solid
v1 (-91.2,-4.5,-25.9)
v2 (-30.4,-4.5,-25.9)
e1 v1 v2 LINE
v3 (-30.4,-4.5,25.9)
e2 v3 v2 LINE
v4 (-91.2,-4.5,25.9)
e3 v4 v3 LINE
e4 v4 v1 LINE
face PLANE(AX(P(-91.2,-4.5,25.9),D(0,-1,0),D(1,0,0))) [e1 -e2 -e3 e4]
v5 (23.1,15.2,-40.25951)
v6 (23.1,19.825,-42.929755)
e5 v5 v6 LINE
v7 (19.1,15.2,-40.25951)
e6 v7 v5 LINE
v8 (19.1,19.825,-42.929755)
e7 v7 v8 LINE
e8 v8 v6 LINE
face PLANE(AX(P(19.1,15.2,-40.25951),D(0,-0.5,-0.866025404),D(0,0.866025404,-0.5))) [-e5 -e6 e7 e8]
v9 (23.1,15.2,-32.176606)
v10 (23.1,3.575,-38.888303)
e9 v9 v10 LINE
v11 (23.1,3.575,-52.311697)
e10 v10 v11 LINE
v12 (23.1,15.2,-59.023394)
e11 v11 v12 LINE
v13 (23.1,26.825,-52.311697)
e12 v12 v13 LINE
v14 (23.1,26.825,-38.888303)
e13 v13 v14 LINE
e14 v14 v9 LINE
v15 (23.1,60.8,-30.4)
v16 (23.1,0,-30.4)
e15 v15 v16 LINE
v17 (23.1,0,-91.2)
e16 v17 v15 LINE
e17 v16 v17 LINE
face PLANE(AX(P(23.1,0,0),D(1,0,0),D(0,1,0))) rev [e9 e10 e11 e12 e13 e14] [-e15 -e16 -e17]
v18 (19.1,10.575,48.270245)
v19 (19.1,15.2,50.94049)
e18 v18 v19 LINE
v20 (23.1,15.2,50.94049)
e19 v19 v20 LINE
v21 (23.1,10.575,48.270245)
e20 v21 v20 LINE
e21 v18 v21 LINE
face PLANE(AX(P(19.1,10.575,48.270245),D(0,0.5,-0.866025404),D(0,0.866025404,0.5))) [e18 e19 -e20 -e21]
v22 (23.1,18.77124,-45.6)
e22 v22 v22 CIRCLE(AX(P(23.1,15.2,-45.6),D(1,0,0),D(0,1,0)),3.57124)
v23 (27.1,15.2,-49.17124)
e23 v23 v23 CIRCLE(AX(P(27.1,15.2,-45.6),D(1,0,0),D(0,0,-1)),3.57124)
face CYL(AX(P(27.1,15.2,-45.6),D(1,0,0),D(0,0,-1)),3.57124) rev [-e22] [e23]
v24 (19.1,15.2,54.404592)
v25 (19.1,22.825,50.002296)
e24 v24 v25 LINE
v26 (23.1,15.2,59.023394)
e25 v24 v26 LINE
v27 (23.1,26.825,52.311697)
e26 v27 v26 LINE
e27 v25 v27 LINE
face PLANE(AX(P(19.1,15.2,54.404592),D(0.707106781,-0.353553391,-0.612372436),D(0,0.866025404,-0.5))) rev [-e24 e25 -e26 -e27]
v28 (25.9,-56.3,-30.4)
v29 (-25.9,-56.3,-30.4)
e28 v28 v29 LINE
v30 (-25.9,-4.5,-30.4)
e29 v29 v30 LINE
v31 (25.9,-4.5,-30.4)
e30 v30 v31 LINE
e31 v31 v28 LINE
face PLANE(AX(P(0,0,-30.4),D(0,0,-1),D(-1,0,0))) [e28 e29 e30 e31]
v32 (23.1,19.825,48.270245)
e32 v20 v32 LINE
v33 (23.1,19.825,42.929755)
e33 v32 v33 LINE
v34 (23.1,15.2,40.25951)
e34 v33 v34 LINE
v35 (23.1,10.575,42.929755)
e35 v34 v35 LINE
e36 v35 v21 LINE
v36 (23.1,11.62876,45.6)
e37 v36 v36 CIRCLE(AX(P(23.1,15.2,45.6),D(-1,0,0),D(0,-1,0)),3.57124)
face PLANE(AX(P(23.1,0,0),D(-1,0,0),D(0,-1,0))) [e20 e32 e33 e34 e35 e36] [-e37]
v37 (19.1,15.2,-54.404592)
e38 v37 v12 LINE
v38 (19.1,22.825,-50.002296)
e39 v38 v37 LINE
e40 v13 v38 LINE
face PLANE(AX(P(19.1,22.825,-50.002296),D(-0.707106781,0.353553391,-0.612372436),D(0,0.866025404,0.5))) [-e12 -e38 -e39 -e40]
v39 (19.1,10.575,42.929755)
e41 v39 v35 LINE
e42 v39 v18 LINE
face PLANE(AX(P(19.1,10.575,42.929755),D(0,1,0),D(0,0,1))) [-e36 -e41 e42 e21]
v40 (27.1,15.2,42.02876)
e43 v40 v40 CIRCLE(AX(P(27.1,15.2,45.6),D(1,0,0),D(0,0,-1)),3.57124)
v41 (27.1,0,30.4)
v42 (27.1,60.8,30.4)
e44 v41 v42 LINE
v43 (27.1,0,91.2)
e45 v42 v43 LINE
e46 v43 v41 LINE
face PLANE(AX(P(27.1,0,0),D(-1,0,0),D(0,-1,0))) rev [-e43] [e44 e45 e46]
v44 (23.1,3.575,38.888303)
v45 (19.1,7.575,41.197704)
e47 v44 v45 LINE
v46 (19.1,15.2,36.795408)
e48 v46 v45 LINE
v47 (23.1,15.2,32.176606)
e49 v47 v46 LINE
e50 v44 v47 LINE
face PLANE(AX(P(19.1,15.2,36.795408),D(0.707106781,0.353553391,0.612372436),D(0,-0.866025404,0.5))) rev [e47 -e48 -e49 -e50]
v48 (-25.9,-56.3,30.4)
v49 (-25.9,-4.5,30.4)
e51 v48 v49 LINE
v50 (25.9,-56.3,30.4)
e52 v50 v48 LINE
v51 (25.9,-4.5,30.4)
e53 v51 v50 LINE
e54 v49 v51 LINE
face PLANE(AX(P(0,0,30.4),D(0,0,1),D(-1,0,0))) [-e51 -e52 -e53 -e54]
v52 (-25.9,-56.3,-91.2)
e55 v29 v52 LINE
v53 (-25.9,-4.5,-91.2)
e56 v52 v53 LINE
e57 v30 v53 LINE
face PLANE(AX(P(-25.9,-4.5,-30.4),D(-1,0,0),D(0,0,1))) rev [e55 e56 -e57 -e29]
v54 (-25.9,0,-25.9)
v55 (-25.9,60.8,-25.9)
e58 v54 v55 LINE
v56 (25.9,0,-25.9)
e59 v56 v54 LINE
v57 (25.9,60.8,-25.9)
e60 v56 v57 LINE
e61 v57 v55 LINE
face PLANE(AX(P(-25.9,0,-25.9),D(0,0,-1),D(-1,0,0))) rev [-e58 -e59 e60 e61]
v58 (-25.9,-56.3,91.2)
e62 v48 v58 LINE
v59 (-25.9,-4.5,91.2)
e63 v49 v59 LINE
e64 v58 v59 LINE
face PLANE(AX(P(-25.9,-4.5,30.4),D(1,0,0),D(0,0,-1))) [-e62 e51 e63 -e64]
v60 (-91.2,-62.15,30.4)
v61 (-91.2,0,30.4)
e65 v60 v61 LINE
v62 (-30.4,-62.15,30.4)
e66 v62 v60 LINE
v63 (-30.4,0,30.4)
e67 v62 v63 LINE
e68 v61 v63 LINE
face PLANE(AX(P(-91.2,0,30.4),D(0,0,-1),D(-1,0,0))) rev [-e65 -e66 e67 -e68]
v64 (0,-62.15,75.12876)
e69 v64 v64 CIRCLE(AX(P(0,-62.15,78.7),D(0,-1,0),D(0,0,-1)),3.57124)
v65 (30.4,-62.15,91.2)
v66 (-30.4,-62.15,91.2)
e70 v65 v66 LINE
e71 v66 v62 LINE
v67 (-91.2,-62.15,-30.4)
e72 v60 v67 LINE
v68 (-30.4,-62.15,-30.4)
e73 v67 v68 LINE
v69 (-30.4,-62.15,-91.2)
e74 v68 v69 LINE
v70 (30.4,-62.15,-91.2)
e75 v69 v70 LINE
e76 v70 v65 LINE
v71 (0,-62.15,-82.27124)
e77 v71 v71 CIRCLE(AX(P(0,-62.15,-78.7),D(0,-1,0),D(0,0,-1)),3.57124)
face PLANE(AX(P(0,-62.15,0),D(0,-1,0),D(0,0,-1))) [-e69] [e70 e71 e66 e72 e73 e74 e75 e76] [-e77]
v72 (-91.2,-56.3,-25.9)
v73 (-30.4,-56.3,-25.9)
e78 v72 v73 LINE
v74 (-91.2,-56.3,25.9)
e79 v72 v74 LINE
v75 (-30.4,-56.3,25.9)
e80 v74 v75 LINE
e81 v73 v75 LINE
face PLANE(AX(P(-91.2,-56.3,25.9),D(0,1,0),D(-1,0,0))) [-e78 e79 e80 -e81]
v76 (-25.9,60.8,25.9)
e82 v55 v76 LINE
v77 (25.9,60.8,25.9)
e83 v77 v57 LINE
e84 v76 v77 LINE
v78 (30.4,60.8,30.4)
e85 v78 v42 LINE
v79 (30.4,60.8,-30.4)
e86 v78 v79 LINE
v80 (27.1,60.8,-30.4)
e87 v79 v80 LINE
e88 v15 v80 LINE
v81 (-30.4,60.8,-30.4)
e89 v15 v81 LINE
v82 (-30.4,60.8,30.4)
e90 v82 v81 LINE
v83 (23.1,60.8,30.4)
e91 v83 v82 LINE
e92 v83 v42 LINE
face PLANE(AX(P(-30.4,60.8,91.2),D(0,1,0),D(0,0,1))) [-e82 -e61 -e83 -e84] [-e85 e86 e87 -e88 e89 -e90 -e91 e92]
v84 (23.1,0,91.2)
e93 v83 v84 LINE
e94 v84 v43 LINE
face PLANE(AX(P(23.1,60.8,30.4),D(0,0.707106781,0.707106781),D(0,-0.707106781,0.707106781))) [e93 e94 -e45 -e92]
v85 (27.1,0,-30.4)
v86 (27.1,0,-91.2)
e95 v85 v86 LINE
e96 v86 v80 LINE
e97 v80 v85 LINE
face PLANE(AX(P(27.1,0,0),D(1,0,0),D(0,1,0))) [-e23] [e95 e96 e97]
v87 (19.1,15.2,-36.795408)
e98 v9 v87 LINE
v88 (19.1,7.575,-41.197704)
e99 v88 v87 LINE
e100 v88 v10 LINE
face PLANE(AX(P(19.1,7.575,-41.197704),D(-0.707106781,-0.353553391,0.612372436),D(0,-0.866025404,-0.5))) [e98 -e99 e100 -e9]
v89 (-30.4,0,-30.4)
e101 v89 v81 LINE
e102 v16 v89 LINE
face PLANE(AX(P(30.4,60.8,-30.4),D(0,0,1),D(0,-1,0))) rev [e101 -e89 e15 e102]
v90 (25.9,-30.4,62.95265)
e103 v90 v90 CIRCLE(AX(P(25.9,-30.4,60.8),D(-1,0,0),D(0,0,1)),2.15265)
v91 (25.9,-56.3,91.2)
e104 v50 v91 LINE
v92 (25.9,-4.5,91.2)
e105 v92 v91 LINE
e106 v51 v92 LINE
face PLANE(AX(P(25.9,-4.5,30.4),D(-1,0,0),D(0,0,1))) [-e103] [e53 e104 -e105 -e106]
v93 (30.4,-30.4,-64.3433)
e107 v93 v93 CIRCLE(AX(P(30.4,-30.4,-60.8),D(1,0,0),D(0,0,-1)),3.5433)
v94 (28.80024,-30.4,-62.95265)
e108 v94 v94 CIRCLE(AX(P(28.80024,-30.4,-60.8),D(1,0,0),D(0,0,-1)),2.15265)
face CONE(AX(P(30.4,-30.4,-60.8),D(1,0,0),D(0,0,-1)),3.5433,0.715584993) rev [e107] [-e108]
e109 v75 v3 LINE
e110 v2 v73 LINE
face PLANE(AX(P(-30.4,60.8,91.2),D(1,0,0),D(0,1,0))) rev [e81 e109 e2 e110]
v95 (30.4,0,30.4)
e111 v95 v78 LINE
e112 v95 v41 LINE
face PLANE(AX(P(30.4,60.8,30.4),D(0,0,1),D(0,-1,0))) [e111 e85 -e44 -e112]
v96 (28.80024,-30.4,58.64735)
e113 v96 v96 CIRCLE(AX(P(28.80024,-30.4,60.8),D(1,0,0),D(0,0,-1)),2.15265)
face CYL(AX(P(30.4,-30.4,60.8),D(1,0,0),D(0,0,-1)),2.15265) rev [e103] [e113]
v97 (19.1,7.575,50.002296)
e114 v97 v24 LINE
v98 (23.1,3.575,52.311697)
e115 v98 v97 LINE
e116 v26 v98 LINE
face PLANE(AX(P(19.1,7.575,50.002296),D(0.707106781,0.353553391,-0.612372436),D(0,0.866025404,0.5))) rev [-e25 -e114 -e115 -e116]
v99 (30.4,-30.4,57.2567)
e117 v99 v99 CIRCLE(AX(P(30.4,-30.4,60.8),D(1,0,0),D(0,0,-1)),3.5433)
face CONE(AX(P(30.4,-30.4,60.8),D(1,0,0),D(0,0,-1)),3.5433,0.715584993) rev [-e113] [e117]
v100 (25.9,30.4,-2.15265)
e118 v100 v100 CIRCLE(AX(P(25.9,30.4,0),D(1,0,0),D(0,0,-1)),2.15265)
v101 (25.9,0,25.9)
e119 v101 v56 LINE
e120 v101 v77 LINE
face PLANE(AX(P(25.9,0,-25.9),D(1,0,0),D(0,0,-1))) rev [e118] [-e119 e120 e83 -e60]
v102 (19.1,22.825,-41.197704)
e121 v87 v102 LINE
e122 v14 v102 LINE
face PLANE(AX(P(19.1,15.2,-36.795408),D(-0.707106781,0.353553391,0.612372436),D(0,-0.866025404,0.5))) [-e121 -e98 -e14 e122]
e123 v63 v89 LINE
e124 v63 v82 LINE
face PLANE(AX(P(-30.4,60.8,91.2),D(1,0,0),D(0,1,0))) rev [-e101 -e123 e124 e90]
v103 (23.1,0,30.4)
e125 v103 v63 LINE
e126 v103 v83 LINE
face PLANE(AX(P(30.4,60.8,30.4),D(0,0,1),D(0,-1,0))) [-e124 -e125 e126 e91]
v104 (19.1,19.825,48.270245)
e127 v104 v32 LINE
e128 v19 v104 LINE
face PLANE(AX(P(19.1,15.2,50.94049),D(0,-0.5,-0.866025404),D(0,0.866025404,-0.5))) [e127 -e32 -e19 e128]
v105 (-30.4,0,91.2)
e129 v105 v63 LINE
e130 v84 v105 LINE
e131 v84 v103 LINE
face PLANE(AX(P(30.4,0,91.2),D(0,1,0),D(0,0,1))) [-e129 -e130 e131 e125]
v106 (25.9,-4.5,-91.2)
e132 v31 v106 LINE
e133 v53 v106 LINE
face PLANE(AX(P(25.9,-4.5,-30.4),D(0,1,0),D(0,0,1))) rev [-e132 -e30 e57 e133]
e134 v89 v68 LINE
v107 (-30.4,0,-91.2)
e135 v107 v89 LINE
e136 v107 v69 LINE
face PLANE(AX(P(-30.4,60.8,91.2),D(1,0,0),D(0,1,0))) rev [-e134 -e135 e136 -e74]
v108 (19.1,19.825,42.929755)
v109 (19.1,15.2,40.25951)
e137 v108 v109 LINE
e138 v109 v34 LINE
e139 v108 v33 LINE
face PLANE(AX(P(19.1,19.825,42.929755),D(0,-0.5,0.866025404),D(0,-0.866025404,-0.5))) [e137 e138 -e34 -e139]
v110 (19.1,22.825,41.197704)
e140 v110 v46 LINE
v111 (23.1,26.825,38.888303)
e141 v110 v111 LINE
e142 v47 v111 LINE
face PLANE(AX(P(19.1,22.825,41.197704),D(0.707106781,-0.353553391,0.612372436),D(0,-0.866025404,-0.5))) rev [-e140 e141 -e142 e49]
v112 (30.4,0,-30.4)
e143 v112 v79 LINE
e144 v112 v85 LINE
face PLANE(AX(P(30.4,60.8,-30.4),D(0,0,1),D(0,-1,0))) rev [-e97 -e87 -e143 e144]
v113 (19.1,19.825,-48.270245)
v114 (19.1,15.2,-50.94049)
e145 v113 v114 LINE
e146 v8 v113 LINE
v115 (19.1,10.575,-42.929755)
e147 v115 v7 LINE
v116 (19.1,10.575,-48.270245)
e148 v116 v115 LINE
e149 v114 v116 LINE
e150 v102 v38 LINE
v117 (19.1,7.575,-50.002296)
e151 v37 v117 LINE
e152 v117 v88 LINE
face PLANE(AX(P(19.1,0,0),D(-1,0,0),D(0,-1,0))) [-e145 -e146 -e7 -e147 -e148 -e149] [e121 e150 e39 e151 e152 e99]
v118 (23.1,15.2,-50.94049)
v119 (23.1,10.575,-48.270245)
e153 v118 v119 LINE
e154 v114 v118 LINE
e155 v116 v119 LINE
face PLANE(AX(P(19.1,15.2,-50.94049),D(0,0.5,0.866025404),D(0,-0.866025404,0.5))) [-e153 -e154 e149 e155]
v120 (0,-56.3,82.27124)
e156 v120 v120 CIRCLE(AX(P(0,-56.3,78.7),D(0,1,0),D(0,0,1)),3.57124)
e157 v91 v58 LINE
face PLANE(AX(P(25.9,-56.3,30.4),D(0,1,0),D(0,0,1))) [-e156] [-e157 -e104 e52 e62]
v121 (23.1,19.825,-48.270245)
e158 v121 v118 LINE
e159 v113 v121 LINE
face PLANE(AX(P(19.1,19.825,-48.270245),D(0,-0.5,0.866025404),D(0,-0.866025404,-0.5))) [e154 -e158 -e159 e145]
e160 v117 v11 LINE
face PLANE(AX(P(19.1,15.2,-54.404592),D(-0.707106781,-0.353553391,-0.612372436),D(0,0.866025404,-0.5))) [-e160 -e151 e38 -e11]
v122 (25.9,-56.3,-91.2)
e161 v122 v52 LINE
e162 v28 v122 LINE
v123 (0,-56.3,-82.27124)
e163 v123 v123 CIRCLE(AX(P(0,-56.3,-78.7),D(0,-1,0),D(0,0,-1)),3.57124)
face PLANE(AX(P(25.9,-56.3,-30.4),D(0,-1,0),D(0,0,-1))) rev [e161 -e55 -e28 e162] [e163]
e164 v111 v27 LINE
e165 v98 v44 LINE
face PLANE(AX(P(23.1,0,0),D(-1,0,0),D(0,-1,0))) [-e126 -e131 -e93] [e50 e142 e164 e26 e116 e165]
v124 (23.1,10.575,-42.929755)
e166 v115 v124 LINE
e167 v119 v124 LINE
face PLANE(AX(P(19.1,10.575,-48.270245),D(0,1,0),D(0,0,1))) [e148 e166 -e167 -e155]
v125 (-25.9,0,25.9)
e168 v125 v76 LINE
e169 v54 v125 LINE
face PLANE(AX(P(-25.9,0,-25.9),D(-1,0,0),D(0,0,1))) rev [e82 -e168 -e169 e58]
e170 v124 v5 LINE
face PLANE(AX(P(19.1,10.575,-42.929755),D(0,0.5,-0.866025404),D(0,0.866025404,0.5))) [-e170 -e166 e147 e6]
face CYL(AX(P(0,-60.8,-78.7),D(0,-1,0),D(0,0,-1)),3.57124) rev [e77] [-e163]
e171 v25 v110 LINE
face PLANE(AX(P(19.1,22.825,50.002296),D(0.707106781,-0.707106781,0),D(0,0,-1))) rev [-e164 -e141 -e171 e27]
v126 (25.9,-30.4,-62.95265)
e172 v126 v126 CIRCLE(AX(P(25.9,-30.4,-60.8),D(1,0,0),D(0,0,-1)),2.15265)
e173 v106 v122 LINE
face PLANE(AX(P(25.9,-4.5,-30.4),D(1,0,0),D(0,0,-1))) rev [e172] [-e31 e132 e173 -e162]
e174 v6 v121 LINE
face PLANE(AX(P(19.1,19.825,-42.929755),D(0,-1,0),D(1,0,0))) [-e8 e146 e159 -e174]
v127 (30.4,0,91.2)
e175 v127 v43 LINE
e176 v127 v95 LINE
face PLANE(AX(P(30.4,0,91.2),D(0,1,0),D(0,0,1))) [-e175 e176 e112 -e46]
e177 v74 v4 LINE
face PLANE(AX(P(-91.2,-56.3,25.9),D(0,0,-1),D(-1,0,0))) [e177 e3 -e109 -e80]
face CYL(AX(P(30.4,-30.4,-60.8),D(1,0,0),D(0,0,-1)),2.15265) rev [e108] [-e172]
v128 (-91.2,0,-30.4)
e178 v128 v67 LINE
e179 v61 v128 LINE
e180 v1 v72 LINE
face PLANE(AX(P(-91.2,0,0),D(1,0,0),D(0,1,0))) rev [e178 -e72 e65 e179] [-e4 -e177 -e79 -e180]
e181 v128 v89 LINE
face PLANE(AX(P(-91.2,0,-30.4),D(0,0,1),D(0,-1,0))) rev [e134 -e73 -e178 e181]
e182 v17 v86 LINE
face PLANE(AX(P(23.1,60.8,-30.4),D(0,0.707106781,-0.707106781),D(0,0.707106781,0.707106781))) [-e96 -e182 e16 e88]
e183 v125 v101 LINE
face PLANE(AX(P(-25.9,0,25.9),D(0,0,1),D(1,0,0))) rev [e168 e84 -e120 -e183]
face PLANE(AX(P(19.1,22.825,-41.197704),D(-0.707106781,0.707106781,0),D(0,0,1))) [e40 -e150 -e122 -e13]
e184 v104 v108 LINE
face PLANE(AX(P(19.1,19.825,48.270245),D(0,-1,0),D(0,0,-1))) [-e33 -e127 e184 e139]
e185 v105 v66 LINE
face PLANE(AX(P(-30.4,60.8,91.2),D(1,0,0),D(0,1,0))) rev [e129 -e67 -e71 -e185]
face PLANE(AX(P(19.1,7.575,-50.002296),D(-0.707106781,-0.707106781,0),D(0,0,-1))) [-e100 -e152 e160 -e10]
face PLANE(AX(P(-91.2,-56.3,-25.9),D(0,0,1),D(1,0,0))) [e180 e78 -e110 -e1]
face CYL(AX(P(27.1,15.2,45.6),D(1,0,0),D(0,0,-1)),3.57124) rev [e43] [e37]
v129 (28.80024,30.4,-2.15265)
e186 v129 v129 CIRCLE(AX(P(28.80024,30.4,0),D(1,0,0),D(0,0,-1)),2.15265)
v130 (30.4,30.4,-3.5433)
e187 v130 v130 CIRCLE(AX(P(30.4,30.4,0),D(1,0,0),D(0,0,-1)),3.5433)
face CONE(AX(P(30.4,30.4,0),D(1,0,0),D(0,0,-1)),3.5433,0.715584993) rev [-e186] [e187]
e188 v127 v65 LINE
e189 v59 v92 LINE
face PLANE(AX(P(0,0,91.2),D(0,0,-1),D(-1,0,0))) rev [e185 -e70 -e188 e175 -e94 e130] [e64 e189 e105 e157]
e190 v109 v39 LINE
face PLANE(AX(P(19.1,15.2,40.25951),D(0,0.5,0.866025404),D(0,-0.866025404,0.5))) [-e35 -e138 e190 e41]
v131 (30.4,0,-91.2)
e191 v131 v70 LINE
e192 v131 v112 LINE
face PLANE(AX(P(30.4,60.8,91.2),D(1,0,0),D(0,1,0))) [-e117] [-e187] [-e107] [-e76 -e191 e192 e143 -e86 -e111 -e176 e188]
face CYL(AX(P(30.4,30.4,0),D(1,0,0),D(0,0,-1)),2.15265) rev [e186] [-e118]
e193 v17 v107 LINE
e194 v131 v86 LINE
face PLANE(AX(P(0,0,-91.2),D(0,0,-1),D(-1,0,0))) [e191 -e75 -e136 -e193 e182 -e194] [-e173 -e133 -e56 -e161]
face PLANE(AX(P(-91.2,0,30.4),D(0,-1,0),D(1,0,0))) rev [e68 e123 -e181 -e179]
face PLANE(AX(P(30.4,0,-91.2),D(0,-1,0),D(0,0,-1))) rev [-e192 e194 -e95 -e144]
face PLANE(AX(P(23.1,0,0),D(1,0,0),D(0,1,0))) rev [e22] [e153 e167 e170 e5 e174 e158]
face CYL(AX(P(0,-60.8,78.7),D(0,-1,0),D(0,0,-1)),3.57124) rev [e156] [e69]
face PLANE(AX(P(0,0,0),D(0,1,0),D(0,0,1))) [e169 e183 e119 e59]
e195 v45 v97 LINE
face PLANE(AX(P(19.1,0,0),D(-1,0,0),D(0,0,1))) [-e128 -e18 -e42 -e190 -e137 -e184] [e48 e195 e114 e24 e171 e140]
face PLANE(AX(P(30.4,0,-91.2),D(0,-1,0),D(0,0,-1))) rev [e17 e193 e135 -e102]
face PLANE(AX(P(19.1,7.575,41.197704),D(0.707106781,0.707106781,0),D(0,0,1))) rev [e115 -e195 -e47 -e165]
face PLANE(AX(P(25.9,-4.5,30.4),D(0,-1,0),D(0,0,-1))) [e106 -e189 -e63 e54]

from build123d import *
from build123d.topology import SkipClean

# Parameters (mm, degrees)
ESQUISSE1_W                                       = 60.8
ESQUISSE1_H                                       = 121.6
BOSS_EXTRU_1_DEPTH                                = 91.2
ESQUISSE2_W                                       = 60.8
ESQUISSE2_H                                       = 60.8
ENL_V_MAT_EXTRU_1_DEPTH                           = 126.342411019
ESQUISSE3_W                                       = 51.8
ESQUISSE3_H                                       = 51.8
ENL_V_MAT_EXTRU_2_DEPTH                           = 60.8
BOSS_EXTRU_3_DEPTH                                = 4
ESQUISSE6_W                                       = 51.8
ESQUISSE6_H                                       = 51.8
ENL_V_MAT_EXTRU_3_DEPTH                           = 60.8
D_GAGEMENT_1_43_D                                 = 7.14248
FRAISAGE_POUR_VIS_T_TE_FRAIS_E_BOMB_E_D           = 4.3053
FRAISAGE_POUR_VIS_T_TE_FRAIS_E_BOMB_E_DEPTH       = 4.5
FRAISAGE_POUR_VIS_T_TE_FRAIS_E_BOMB_E_CSINK_D     = 7.0866
FRAISAGE_POUR_VIS_T_TE_FRAIS_E_BOMB_E_CSINK_ANGLE = 82
D_GAGEMENT_1_42_D                                 = 7.14248
D_GAGEMENT_1_42_DEPTH                             = 20
BOSS_EXTRU_5_DEPTH                                = 4
CHANFREIN1_SIZE                                   = 4
ESQUISSE26_W                                      = 60.8
ESQUISSE26_H                                      = 60.8
ESQUISSE26_W_2                                    = 51.800000032
ESQUISSE26_H_2                                    = 51.800000032
BOSS_EXTRU_8_DEPTH                                = 60.800000066
ESQUISSE27_R                                      = 3.57124
BOSS_EXTRU_9_DEPTH                                = 1.35


with BuildPart() as part:
    # Esquisse1 → Boss.-Extru.1 (new, symmetric)
    with BuildSketch(Plane.XY):
        Rectangle(ESQUISSE1_W, ESQUISSE1_H)
    extrude(amount=BOSS_EXTRU_1_DEPTH, both=True)

    # Esquisse2 → Enlèv. mat.-Extru.1 (cut, through all)
    with BuildSketch(Plane.ZY.offset(30.4)):
        with Locations((-60.8, 30.4)):
            Rectangle(ESQUISSE2_W, ESQUISSE2_H)
    enl_v_mat_extru_1 = extrude(amount=-ENL_V_MAT_EXTRU_1_DEPTH, mode=Mode.SUBTRACT)

    # Esquisse3 → Enlèv. mat.-Extru.2 (cut)
    with BuildSketch(Plane(origin=(0, 0, -91.2), x_dir=(-1, 0, 0), z_dir=(0, 0, -1))):
        with Locations((0, -30.4)):
            Rectangle(ESQUISSE3_W, ESQUISSE3_H)
    enl_v_mat_extru_2 = extrude(amount=-ENL_V_MAT_EXTRU_2_DEPTH, mode=Mode.SUBTRACT)

    # Symétrie2: Enlèv. mat.-Extru.1, Enlèv. mat.-Extru.2 across plane
    add(enl_v_mat_extru_1.mirror(Plane.XY), mode=Mode.SUBTRACT)
    add(enl_v_mat_extru_2.mirror(Plane.XY), mode=Mode.SUBTRACT)

    # Esquisse10 → Boss.-Extru.3 (add)
    with BuildSketch(Plane(origin=(27.1, 0, 0), x_dir=(0, 0, -1), z_dir=(1, 0, 0))):
        Polygon((30.4, 60.8), (30.4, 0), (91.2, 0), align=None)
        Polygon((-30.4, 60.8), (-91.2, 0), (-30.4, 0), align=None)
    extrude(amount=-BOSS_EXTRU_3_DEPTH)

    # Esquisse6 → Enlèv. mat.-Extru.3 (cut)
    with BuildSketch(Plane(origin=(0, 60.8, 0), x_dir=(1, 0, 0), z_dir=(0, 1, 0))):
        Rectangle(ESQUISSE6_W, ESQUISSE6_H)
    extrude(amount=-ENL_V_MAT_EXTRU_3_DEPTH, mode=Mode.SUBTRACT)

    # Dégagement 1/43 (through all)
    with Locations(Plane(origin=(27.1, 0, 0), x_dir=(0, 0, -1), z_dir=(1, 0, 0))):
        with Locations((45.6, 15.2), (-45.6, 15.2)):
            Hole(D_GAGEMENT_1_43_D / 2)

    # Fraisage pour vis _ t_te frais_e bomb_e
    with Locations(Plane(origin=(30.4, 0, 0), x_dir=(0, 0, -1), z_dir=(1, 0, 0))):
        with Locations((-60.8, -30.4), (0, 30.4), (60.8, -30.4)):
            CounterSinkHole(FRAISAGE_POUR_VIS_T_TE_FRAIS_E_BOMB_E_D / 2, FRAISAGE_POUR_VIS_T_TE_FRAIS_E_BOMB_E_CSINK_D / 2, depth=FRAISAGE_POUR_VIS_T_TE_FRAIS_E_BOMB_E_DEPTH, counter_sink_angle=FRAISAGE_POUR_VIS_T_TE_FRAIS_E_BOMB_E_CSINK_ANGLE)

    # Dégagement 1/42
    with Locations(Plane(origin=(0, -60.8, 0), x_dir=(-1, 0, 0), z_dir=(0, -1, 0))):
        with Locations((0, 78.7), (0, -78.7)):
            Hole(D_GAGEMENT_1_42_D / 2, depth=D_GAGEMENT_1_42_DEPTH)

    # Esquisse23 → Boss.-Extru.5 (add)
    # profile 1 of 2: a face of its own
    with BuildSketch(Plane.ZY.offset(-23.1)):
        Polygon((-41.197704197, 22.825), (-50.002295803, 22.825), (-54.404591605, 15.2), (-50.002295803, 7.575), (-41.197704197, 7.575), (-36.795408395, 15.2), align=None)
        Polygon((-40.25951001, 15.2), (-42.929755005, 19.825), (-48.270244995, 19.825), (-50.94048999, 15.2), (-48.270244995, 10.575), (-42.929755005, 10.575), align=None, mode=Mode.SUBTRACT)
    # profile 2 of 2: a face of its own
    with BuildSketch(Plane.ZY.offset(-23.1)):
        Polygon((54.404591605, 15.2), (50.002295803, 22.825), (41.197704197, 22.825), (36.795408395, 15.2), (41.197704197, 7.575), (50.002295803, 7.575), align=None)
        Polygon((50.94048999, 15.2), (48.270244995, 19.825), (42.929755005, 19.825), (40.25951001, 15.2), (42.929755005, 10.575), (48.270244995, 10.575), align=None, mode=Mode.SUBTRACT)
    extrude(amount=BOSS_EXTRU_5_DEPTH)

    # Chanfrein1
    chanfrein1_edges = [part.edges().sort_by_distance(p)[0] for p in [
        (23.1, 19.0125, 38.996556296),
        (23.1, 11.3875, 38.996556296),
        (23.1, 7.575, 45.6),
        (23.1, 11.3875, 52.203443704),
        (23.1, 19.0125, 52.203443704),
        (23.1, 22.825, 45.6),
        (23.1, 11.3875, -38.996556296),
        (23.1, 19.0125, -38.996556296),
        (23.1, 7.575, -45.6),
        (23.1, 11.3875, -52.203443704),
        (23.1, 22.825, -45.6),
        (23.1, 19.0125, -52.203443704),
    ]]
    chamfer(chanfrein1_edges, length=CHANFREIN1_SIZE - 0.0001)  # a hair under: the kernel refuses the full size

    # Esquisse26 → Boss.-Extru.8 (add)
    with BuildSketch(Plane.ZY.offset(30.4)):
        with Locations((0, -30.4)):
            Rectangle(ESQUISSE26_W, ESQUISSE26_H)
        with Locations((0, -30.4)):
            Rectangle(ESQUISSE26_W_2, ESQUISSE26_H_2, mode=Mode.SUBTRACT)
    extrude(amount=BOSS_EXTRU_8_DEPTH)

    # Esquisse27 → Boss.-Extru.9 (add)
    with SkipClean():  # the faces are left unmerged after this step: merging them gives an invalid solid
        with BuildSketch(Plane.XZ.offset(60.8)):
            Polygon((-30.4, -91.2), (30.4, -91.2), (30.4, 91.2), (-30.4, 91.2), (-30.4, 30.4), (-91.200000066, 30.4), (-91.200000066, -30.4), (-30.4, -30.4), align=None)
            with Locations(Location((0, 78.7, 0), (0, 0, 270))):
                Circle(ESQUISSE27_R, mode=Mode.SUBTRACT)
            with Locations(Location((0, -78.7, 0), (0, 0, 270))):
                Circle(ESQUISSE27_R, mode=Mode.SUBTRACT)
        extrude(amount=BOSS_EXTRU_9_DEPTH)
    add(part.part.scale(1), mode=Mode.REPLACE)  # the faces are merged on a copy


solid = part.part
